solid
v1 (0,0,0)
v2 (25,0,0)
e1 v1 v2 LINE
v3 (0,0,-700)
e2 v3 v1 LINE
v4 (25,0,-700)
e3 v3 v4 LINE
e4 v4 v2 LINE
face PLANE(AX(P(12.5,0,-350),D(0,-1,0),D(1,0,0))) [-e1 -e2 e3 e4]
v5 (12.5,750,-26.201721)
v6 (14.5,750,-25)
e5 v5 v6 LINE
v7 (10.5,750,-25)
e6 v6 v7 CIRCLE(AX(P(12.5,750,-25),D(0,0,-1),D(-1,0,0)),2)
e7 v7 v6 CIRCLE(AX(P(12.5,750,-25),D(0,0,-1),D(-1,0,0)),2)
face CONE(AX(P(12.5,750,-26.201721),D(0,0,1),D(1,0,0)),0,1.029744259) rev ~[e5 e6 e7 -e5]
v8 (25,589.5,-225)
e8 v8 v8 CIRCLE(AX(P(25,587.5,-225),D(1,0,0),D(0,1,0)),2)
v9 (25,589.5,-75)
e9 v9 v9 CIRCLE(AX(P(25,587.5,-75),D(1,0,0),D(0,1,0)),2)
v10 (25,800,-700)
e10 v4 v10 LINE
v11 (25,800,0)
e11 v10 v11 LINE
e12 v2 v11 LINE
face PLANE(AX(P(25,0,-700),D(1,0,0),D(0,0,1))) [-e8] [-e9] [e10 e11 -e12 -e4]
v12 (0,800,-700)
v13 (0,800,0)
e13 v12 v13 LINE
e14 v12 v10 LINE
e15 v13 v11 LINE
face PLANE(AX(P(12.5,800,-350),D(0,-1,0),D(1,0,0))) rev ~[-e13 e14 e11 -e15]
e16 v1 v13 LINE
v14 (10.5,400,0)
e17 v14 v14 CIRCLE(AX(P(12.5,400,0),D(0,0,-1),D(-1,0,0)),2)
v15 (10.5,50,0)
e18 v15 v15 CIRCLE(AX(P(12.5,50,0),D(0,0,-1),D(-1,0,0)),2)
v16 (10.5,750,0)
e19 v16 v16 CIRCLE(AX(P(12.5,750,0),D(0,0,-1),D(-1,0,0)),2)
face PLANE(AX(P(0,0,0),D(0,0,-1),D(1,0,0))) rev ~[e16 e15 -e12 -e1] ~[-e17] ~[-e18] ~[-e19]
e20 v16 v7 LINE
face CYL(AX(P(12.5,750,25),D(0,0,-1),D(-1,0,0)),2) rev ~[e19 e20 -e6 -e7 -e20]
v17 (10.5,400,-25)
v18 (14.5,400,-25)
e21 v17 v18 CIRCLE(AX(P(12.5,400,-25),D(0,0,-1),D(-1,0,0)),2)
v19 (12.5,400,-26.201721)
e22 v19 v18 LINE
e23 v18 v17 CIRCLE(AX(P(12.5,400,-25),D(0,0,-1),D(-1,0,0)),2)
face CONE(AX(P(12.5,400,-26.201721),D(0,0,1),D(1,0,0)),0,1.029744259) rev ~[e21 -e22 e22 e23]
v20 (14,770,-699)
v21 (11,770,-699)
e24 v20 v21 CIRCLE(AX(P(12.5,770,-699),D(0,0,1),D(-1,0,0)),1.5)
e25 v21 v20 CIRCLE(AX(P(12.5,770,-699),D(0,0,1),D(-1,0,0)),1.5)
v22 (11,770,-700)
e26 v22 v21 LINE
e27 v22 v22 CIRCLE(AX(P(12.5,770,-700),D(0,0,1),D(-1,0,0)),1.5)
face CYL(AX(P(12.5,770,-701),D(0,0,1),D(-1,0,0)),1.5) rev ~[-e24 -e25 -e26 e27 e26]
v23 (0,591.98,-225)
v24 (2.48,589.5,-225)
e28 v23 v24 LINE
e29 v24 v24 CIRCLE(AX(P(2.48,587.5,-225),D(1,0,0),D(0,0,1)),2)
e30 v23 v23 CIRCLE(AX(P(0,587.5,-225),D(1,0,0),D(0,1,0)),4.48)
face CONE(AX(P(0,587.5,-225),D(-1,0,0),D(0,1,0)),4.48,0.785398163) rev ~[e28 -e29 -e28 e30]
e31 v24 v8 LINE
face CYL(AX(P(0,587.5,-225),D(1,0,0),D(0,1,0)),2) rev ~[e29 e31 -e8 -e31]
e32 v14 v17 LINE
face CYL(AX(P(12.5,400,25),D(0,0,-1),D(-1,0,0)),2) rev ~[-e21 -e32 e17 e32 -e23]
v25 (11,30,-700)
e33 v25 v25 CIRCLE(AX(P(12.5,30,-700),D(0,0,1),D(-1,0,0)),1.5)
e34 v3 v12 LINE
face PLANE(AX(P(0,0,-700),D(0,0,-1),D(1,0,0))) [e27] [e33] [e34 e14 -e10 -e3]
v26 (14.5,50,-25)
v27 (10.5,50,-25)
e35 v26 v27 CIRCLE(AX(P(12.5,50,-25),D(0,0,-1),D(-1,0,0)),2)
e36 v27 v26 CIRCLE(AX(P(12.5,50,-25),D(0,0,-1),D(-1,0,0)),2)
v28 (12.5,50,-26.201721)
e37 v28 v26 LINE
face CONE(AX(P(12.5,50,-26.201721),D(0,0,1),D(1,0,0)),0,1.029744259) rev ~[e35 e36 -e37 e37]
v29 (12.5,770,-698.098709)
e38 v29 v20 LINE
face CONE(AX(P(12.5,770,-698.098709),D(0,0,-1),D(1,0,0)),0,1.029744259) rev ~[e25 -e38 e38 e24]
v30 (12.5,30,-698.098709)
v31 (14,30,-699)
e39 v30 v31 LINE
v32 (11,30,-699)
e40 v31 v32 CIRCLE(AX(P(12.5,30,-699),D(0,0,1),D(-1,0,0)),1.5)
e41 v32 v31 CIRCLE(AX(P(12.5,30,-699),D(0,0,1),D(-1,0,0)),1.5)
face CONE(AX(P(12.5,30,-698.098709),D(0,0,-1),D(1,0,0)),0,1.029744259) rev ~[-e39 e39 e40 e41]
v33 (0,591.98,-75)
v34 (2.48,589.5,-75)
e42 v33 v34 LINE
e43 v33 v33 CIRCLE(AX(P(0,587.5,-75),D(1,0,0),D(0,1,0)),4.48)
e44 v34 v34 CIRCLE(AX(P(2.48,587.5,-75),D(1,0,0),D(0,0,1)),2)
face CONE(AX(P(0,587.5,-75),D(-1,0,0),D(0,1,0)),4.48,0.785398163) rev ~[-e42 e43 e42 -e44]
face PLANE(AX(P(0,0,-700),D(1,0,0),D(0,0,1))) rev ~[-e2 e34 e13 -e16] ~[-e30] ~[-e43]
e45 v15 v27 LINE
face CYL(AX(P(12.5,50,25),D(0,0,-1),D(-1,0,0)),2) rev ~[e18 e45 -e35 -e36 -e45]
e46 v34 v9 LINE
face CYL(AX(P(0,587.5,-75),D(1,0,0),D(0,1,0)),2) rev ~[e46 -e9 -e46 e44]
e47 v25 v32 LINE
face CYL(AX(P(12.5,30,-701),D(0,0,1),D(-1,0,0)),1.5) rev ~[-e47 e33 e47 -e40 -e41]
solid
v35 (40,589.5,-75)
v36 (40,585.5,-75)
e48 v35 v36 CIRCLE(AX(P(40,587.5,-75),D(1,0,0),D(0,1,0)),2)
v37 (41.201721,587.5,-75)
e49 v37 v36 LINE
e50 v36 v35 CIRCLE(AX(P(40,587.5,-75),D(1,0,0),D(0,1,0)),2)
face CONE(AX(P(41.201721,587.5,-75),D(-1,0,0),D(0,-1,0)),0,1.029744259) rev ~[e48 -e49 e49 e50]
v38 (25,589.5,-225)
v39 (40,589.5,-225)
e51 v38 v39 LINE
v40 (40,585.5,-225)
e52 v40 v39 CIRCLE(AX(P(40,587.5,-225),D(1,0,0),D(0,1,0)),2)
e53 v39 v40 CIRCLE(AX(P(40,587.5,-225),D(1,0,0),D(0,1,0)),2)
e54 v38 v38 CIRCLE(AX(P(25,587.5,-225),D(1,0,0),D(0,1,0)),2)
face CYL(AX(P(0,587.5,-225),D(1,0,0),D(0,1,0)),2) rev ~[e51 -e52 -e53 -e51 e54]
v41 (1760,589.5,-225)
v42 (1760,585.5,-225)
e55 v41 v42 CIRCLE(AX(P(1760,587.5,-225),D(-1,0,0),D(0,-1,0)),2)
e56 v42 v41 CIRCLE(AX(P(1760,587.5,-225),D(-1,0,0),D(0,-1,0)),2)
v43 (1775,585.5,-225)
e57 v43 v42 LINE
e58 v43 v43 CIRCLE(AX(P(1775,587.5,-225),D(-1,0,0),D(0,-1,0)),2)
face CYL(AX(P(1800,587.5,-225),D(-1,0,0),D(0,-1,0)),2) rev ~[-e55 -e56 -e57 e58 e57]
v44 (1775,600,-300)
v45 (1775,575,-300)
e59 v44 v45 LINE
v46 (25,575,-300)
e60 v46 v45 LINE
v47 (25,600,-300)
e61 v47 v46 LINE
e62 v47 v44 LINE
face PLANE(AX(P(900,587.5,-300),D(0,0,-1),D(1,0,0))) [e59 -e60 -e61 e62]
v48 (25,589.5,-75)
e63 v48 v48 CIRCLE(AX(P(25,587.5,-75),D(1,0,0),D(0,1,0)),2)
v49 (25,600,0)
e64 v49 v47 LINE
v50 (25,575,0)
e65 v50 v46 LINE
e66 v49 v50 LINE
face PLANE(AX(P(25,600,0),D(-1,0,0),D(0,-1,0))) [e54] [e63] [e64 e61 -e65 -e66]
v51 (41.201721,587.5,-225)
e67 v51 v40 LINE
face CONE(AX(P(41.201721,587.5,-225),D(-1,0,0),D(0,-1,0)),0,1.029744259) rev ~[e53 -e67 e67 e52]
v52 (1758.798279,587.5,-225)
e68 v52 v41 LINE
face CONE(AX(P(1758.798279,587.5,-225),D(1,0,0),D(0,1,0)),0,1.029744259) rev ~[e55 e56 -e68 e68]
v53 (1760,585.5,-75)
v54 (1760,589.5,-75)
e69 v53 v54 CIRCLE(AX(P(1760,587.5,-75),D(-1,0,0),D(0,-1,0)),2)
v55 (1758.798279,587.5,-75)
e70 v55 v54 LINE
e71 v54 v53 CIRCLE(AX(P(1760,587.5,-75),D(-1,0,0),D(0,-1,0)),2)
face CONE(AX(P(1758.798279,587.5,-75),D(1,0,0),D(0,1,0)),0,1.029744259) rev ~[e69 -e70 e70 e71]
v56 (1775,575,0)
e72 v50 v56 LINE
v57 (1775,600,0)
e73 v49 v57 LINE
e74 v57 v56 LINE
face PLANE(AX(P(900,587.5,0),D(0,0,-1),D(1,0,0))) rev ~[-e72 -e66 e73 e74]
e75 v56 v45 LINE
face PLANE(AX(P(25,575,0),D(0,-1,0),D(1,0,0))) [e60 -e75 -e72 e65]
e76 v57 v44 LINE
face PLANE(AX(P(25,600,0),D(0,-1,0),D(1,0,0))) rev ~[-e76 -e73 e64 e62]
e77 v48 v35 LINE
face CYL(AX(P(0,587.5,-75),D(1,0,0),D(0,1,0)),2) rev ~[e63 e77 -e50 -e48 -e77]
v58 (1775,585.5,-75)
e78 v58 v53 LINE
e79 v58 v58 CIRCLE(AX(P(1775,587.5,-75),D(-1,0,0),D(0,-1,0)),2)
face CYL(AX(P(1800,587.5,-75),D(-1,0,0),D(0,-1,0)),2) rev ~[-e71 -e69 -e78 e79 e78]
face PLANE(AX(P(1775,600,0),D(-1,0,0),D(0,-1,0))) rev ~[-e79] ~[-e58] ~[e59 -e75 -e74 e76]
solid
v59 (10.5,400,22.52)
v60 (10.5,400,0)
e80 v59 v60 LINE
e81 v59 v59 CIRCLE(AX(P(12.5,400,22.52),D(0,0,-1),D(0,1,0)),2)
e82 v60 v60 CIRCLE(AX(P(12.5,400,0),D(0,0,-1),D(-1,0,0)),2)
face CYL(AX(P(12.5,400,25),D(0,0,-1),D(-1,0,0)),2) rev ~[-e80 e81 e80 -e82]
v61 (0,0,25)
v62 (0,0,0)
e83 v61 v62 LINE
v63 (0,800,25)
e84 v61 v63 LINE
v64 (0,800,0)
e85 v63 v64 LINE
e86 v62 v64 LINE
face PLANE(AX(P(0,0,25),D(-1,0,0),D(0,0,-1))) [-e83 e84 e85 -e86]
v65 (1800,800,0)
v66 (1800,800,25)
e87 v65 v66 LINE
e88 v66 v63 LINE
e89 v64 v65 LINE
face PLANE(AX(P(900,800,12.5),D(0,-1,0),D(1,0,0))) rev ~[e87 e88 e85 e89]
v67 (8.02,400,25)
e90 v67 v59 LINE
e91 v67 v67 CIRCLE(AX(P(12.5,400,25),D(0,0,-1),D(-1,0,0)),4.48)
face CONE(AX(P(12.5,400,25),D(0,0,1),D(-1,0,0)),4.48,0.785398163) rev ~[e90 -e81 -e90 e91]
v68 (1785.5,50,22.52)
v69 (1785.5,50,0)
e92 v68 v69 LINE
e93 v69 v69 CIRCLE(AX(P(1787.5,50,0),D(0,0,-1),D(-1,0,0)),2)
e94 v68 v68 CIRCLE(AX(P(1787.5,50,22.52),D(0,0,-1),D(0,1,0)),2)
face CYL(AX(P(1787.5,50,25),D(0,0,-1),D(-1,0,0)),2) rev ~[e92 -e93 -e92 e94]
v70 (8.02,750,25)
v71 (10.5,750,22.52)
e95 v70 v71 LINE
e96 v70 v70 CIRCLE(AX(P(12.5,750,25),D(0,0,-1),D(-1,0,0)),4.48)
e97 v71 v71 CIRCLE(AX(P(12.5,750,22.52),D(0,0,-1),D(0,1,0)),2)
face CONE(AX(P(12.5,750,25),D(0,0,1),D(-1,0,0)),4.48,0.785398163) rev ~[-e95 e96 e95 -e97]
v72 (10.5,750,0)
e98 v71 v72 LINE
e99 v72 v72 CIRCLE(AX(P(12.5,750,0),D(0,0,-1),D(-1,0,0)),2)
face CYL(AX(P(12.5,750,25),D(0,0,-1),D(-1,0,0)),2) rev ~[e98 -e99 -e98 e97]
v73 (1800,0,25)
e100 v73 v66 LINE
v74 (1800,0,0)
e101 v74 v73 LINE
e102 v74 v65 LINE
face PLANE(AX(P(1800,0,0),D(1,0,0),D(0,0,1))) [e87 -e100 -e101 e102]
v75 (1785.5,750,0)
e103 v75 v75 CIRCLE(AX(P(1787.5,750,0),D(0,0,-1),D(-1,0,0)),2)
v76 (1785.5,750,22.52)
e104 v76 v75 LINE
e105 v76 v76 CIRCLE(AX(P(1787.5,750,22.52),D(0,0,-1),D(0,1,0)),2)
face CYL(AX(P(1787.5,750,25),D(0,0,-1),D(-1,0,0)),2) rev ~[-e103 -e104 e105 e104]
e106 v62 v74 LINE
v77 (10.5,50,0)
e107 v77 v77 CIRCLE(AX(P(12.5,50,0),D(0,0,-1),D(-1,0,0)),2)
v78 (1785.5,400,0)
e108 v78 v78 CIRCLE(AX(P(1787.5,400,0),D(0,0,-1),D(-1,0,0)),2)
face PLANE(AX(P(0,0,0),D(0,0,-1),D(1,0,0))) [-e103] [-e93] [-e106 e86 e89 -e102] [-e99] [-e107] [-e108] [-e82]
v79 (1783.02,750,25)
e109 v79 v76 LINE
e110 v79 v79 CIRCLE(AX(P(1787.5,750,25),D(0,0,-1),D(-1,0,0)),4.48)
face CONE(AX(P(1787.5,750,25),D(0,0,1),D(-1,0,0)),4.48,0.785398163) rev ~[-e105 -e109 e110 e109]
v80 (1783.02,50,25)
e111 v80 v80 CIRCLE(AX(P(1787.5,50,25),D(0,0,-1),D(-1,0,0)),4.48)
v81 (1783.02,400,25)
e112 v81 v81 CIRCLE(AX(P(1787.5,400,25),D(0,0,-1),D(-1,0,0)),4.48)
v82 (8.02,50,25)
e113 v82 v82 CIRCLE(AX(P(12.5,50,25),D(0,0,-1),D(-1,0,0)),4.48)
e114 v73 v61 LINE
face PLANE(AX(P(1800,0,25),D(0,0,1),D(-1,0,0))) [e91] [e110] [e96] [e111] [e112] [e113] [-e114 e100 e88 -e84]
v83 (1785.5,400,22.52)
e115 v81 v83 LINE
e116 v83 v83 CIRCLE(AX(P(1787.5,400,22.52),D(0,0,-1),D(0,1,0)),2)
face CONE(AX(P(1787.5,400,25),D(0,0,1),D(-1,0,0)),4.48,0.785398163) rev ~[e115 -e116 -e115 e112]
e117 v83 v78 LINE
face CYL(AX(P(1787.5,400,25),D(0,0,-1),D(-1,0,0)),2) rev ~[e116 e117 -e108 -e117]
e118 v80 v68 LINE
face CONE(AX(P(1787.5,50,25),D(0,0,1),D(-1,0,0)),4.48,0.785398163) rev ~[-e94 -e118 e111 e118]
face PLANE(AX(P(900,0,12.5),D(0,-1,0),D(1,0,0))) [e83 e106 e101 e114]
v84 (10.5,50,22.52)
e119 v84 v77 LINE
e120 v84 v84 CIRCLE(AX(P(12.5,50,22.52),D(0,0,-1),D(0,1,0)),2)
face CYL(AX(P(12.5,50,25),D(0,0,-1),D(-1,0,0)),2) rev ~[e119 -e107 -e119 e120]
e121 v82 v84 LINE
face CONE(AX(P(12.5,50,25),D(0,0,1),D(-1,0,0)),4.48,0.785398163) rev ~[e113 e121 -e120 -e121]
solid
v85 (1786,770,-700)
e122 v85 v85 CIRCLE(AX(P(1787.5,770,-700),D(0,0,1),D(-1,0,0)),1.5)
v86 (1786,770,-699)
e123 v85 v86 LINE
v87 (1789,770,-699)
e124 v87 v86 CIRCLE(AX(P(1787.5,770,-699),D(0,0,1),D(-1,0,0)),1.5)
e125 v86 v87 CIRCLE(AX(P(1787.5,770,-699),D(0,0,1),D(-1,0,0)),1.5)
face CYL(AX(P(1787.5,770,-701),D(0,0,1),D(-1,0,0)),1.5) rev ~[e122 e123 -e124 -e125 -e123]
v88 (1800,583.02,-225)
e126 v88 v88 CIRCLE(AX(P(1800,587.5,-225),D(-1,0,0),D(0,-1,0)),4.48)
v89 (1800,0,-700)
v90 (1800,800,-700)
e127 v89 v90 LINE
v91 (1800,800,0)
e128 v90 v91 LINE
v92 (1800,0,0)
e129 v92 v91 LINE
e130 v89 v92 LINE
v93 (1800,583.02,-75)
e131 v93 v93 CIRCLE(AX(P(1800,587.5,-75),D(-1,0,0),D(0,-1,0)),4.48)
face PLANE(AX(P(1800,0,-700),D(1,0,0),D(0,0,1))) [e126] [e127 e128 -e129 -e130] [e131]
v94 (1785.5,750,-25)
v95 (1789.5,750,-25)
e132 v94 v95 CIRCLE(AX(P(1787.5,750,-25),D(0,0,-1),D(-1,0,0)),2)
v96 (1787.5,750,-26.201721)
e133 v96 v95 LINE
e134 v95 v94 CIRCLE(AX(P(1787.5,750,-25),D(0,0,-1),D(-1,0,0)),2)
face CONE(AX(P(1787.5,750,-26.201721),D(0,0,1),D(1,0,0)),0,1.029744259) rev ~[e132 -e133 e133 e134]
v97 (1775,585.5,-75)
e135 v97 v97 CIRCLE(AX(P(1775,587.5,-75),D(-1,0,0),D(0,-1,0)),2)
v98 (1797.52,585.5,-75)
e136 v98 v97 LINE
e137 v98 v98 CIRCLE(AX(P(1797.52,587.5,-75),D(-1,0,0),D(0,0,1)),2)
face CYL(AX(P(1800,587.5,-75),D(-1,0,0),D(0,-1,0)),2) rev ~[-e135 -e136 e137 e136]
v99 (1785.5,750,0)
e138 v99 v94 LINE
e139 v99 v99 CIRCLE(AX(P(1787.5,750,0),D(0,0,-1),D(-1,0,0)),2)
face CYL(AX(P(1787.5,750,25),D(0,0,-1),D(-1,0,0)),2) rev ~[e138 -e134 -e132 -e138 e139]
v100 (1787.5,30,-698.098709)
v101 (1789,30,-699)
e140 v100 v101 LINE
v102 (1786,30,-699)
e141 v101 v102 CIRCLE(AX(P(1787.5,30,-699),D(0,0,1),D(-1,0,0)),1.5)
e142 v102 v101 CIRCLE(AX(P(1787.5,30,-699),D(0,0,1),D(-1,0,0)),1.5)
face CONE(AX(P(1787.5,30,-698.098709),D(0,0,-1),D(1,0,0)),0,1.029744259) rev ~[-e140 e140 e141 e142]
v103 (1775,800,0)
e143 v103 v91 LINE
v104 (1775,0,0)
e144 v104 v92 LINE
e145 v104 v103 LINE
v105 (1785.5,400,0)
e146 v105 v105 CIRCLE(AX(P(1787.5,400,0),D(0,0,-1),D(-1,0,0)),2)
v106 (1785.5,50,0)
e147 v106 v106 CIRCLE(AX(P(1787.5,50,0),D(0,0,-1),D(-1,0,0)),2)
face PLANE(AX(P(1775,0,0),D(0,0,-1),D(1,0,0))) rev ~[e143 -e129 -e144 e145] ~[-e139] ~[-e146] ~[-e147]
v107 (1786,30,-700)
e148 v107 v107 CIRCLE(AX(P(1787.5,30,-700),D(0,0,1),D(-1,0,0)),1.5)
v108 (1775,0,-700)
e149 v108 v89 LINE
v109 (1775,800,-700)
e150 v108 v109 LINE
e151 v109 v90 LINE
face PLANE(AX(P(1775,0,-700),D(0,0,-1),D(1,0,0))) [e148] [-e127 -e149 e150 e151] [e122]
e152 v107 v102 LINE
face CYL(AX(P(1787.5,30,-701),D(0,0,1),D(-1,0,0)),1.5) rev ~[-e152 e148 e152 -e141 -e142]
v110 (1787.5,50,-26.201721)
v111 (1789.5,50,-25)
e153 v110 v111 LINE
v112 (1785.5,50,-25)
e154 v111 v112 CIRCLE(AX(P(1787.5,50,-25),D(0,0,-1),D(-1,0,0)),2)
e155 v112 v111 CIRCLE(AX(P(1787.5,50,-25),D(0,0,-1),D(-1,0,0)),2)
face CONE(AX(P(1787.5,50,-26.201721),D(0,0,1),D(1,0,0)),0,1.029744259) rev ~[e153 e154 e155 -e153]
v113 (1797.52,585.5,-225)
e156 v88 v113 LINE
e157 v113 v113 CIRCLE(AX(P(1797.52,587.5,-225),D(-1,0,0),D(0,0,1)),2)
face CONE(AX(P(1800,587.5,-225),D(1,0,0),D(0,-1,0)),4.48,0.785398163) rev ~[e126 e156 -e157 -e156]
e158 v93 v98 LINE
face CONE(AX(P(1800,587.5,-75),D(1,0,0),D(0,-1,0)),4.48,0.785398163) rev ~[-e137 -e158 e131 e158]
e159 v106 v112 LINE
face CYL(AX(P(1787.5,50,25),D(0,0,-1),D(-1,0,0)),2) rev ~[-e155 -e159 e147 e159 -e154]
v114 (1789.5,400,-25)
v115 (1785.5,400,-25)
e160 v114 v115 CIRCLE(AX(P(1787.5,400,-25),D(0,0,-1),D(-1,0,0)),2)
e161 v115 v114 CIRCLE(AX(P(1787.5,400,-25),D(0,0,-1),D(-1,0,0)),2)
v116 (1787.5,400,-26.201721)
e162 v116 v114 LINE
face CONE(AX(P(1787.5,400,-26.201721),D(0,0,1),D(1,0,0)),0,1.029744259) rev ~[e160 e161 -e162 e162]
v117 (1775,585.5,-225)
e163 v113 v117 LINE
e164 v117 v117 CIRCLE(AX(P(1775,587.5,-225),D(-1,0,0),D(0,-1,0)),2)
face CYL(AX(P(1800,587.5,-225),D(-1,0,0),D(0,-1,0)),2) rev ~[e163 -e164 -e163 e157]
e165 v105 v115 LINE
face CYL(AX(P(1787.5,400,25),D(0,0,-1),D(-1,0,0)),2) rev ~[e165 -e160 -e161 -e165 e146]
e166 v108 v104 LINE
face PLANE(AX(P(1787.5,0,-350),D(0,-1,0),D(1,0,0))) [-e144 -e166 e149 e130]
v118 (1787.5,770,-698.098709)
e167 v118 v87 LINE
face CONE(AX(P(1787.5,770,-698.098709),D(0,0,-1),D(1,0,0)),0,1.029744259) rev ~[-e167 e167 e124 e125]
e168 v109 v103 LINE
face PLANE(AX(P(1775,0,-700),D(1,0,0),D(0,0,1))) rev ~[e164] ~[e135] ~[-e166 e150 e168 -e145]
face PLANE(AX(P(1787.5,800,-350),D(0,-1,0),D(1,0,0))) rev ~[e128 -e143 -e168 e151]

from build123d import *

# Parameters (mm, degrees)
F1_DEPTH          = 800
F0_W              = 25
F0_H              = 700
F2_DEPTH          = 800
F3_W              = 1750
F3_H              = 25
F4_DEPTH          = 300
F6_D              = 4
F6_DEPTH          = 50
F6_CSINK_D        = 8.96
F6_CSINK_ANGLE    = 90
F6_TIP            = 1.2017212381
F6_2_D            = 4
F6_2_DEPTH        = 50
F6_2_CSINK_D      = 8.96
F6_2_CSINK_ANGLE  = 90
F6_2_TIP          = 1.2017212381
F6_3_D            = 4
F6_3_DEPTH        = 50
F6_3_CSINK_D      = 8.96
F6_3_CSINK_ANGLE  = 90
F6_3_TIP          = 1.2017212381
F8_D              = 4
F8_DEPTH          = 40
F8_CSINK_D        = 8.96
F8_CSINK_ANGLE    = 90
F8_TIP            = 1.2017212381
F8_2_D            = 4
F8_2_DEPTH        = 40
F8_2_CSINK_D      = 8.96
F8_2_CSINK_ANGLE  = 90
F8_2_TIP          = 1.2017212381
F10_D             = 4
F10_DEPTH         = 40
F10_CSINK_D       = 8.96
F10_CSINK_ANGLE   = 90
F10_TIP           = 1.2017212381
F10_2_D           = 4
F10_2_DEPTH       = 40
F10_2_CSINK_D     = 8.96
F10_2_CSINK_ANGLE = 90
F10_2_TIP         = 1.2017212381
F12_D             = 3
F12_DEPTH         = 1
F12_TIP           = 0.9012909285
F12_2_D           = 3
F12_2_DEPTH       = 1
F12_2_TIP         = 0.9012909285


# Not quite as in the source:
# - a feature names something its author has since deleted; it is built from what else it names


with BuildPart() as f1:
    # F0 (on Front) → F1 (new body)
    with BuildSketch(Plane.XZ):
        Polygon((0, 25), (0, 0), (25, 0), (1775, 0), (1800, 0), (1800, 25), align=None)
    extrude(amount=-F1_DEPTH)

    # F6
    with Locations(Plane.XY.offset(25)):
        with Locations((12.5, 750), (12.5, 400), (12.5, 50), (1787.5, 750), (1787.5, 400), (1787.5, 50)):
            CounterSinkHole(F6_D / 2, F6_CSINK_D / 2, depth=F6_DEPTH, counter_sink_angle=F6_CSINK_ANGLE)
            with Locations((0, 0, -(F6_DEPTH + F6_TIP / 2))):  # 118° drill point
                Cone(0, F6_D / 2, F6_TIP, mode=Mode.SUBTRACT)


with BuildPart() as f2:
    # F0 (on Front) → F2 (new body)
    with BuildSketch(Plane.XZ):
        with Locations((12.5, -350)):
            Rectangle(F0_W, F0_H)
    extrude(amount=-F2_DEPTH)

    # F6#2
    with Locations(Plane.XY.offset(25)):
        with Locations((12.5, 750), (12.5, 400), (12.5, 50), (1787.5, 750), (1787.5, 400), (1787.5, 50)):
            CounterSinkHole(F6_2_D / 2, F6_2_CSINK_D / 2, depth=F6_2_DEPTH, counter_sink_angle=F6_2_CSINK_ANGLE)
            with Locations((0, 0, -(F6_2_DEPTH + F6_2_TIP / 2))):  # 118° drill point
                Cone(0, F6_2_D / 2, F6_2_TIP, mode=Mode.SUBTRACT)

    # F8
    with Locations(Plane(origin=(0, 0, 0), x_dir=(0, -1, 0), z_dir=(-1, 0, 0))):
        with Locations((-587.5, -75), (-587.5, -225)):
            CounterSinkHole(F8_D / 2, F8_CSINK_D / 2, depth=F8_DEPTH, counter_sink_angle=F8_CSINK_ANGLE)
            with Locations((0, 0, -(F8_DEPTH + F8_TIP / 2))):  # 118° drill point
                Cone(0, F8_D / 2, F8_TIP, mode=Mode.SUBTRACT)

    # F12
    with Locations(Plane(origin=(0, 0, -700), x_dir=(1, 0, 0), z_dir=(0, 0, -1))):
        with Locations((1787.5, -30), (1787.5, -770), (12.5, -30), (12.5, -770)):
            Hole(F12_D / 2, depth=F12_DEPTH)
            with Locations((0, 0, -(F12_DEPTH + F12_TIP / 2))):  # 118° drill point
                Cone(0, F12_D / 2, F12_TIP, mode=Mode.SUBTRACT)


with BuildPart() as f2b:
    # F0 (on Front) → F2, piece 2 (new body)
    with BuildSketch(Plane.XZ):
        with Locations((1787.5, -350)):
            Rectangle(F0_W, F0_H)
    extrude(amount=-F2_DEPTH)

    # F6#3
    with Locations(Plane.XY.offset(25)):
        with Locations((12.5, 750), (12.5, 400), (12.5, 50), (1787.5, 750), (1787.5, 400), (1787.5, 50)):
            CounterSinkHole(F6_3_D / 2, F6_3_CSINK_D / 2, depth=F6_3_DEPTH, counter_sink_angle=F6_3_CSINK_ANGLE)
            with Locations((0, 0, -(F6_3_DEPTH + F6_3_TIP / 2))):  # 118° drill point
                Cone(0, F6_3_D / 2, F6_3_TIP, mode=Mode.SUBTRACT)

    # F10
    with Locations(Plane.YZ.offset(1800)):
        with Locations((587.5, -75), (587.5, -225)):
            CounterSinkHole(F10_D / 2, F10_CSINK_D / 2, depth=F10_DEPTH, counter_sink_angle=F10_CSINK_ANGLE)
            with Locations((0, 0, -(F10_DEPTH + F10_TIP / 2))):  # 118° drill point
                Cone(0, F10_D / 2, F10_TIP, mode=Mode.SUBTRACT)

    # F12#2
    with Locations(Plane(origin=(0, 0, -700), x_dir=(1, 0, 0), z_dir=(0, 0, -1))):
        with Locations((1787.5, -30), (1787.5, -770), (12.5, -30), (12.5, -770)):
            Hole(F12_2_D / 2, depth=F12_2_DEPTH)
            with Locations((0, 0, -(F12_2_DEPTH + F12_2_TIP / 2))):  # 118° drill point
                Cone(0, F12_2_D / 2, F12_2_TIP, mode=Mode.SUBTRACT)


with BuildPart() as f4:
    # F3 (on face) → F4 (new body)
    with BuildSketch(Plane(origin=(0, 0, 0), x_dir=(1, 0, 0), z_dir=(0, 0, -1))):
        with Locations((900, -587.5)):
            Rectangle(F3_W, F3_H)
    extrude(amount=F4_DEPTH)

    # F8#2
    with Locations(Plane(origin=(0, 0, 0), x_dir=(0, -1, 0), z_dir=(-1, 0, 0))):
        with Locations((-587.5, -75), (-587.5, -225)):
            CounterSinkHole(F8_2_D / 2, F8_2_CSINK_D / 2, depth=F8_2_DEPTH, counter_sink_angle=F8_2_CSINK_ANGLE)
            with Locations((0, 0, -(F8_2_DEPTH + F8_2_TIP / 2))):  # 118° drill point
                Cone(0, F8_2_D / 2, F8_2_TIP, mode=Mode.SUBTRACT)

    # F10#2
    with Locations(Plane.YZ.offset(1800)):
        with Locations((587.5, -75), (587.5, -225)):
            CounterSinkHole(F10_2_D / 2, F10_2_CSINK_D / 2, depth=F10_2_DEPTH, counter_sink_angle=F10_2_CSINK_ANGLE)
            with Locations((0, 0, -(F10_2_DEPTH + F10_2_TIP / 2))):  # 118° drill point
                Cone(0, F10_2_D / 2, F10_2_TIP, mode=Mode.SUBTRACT)


solid = Compound([f1.part, f2.part, f2b.part, f4.part])
